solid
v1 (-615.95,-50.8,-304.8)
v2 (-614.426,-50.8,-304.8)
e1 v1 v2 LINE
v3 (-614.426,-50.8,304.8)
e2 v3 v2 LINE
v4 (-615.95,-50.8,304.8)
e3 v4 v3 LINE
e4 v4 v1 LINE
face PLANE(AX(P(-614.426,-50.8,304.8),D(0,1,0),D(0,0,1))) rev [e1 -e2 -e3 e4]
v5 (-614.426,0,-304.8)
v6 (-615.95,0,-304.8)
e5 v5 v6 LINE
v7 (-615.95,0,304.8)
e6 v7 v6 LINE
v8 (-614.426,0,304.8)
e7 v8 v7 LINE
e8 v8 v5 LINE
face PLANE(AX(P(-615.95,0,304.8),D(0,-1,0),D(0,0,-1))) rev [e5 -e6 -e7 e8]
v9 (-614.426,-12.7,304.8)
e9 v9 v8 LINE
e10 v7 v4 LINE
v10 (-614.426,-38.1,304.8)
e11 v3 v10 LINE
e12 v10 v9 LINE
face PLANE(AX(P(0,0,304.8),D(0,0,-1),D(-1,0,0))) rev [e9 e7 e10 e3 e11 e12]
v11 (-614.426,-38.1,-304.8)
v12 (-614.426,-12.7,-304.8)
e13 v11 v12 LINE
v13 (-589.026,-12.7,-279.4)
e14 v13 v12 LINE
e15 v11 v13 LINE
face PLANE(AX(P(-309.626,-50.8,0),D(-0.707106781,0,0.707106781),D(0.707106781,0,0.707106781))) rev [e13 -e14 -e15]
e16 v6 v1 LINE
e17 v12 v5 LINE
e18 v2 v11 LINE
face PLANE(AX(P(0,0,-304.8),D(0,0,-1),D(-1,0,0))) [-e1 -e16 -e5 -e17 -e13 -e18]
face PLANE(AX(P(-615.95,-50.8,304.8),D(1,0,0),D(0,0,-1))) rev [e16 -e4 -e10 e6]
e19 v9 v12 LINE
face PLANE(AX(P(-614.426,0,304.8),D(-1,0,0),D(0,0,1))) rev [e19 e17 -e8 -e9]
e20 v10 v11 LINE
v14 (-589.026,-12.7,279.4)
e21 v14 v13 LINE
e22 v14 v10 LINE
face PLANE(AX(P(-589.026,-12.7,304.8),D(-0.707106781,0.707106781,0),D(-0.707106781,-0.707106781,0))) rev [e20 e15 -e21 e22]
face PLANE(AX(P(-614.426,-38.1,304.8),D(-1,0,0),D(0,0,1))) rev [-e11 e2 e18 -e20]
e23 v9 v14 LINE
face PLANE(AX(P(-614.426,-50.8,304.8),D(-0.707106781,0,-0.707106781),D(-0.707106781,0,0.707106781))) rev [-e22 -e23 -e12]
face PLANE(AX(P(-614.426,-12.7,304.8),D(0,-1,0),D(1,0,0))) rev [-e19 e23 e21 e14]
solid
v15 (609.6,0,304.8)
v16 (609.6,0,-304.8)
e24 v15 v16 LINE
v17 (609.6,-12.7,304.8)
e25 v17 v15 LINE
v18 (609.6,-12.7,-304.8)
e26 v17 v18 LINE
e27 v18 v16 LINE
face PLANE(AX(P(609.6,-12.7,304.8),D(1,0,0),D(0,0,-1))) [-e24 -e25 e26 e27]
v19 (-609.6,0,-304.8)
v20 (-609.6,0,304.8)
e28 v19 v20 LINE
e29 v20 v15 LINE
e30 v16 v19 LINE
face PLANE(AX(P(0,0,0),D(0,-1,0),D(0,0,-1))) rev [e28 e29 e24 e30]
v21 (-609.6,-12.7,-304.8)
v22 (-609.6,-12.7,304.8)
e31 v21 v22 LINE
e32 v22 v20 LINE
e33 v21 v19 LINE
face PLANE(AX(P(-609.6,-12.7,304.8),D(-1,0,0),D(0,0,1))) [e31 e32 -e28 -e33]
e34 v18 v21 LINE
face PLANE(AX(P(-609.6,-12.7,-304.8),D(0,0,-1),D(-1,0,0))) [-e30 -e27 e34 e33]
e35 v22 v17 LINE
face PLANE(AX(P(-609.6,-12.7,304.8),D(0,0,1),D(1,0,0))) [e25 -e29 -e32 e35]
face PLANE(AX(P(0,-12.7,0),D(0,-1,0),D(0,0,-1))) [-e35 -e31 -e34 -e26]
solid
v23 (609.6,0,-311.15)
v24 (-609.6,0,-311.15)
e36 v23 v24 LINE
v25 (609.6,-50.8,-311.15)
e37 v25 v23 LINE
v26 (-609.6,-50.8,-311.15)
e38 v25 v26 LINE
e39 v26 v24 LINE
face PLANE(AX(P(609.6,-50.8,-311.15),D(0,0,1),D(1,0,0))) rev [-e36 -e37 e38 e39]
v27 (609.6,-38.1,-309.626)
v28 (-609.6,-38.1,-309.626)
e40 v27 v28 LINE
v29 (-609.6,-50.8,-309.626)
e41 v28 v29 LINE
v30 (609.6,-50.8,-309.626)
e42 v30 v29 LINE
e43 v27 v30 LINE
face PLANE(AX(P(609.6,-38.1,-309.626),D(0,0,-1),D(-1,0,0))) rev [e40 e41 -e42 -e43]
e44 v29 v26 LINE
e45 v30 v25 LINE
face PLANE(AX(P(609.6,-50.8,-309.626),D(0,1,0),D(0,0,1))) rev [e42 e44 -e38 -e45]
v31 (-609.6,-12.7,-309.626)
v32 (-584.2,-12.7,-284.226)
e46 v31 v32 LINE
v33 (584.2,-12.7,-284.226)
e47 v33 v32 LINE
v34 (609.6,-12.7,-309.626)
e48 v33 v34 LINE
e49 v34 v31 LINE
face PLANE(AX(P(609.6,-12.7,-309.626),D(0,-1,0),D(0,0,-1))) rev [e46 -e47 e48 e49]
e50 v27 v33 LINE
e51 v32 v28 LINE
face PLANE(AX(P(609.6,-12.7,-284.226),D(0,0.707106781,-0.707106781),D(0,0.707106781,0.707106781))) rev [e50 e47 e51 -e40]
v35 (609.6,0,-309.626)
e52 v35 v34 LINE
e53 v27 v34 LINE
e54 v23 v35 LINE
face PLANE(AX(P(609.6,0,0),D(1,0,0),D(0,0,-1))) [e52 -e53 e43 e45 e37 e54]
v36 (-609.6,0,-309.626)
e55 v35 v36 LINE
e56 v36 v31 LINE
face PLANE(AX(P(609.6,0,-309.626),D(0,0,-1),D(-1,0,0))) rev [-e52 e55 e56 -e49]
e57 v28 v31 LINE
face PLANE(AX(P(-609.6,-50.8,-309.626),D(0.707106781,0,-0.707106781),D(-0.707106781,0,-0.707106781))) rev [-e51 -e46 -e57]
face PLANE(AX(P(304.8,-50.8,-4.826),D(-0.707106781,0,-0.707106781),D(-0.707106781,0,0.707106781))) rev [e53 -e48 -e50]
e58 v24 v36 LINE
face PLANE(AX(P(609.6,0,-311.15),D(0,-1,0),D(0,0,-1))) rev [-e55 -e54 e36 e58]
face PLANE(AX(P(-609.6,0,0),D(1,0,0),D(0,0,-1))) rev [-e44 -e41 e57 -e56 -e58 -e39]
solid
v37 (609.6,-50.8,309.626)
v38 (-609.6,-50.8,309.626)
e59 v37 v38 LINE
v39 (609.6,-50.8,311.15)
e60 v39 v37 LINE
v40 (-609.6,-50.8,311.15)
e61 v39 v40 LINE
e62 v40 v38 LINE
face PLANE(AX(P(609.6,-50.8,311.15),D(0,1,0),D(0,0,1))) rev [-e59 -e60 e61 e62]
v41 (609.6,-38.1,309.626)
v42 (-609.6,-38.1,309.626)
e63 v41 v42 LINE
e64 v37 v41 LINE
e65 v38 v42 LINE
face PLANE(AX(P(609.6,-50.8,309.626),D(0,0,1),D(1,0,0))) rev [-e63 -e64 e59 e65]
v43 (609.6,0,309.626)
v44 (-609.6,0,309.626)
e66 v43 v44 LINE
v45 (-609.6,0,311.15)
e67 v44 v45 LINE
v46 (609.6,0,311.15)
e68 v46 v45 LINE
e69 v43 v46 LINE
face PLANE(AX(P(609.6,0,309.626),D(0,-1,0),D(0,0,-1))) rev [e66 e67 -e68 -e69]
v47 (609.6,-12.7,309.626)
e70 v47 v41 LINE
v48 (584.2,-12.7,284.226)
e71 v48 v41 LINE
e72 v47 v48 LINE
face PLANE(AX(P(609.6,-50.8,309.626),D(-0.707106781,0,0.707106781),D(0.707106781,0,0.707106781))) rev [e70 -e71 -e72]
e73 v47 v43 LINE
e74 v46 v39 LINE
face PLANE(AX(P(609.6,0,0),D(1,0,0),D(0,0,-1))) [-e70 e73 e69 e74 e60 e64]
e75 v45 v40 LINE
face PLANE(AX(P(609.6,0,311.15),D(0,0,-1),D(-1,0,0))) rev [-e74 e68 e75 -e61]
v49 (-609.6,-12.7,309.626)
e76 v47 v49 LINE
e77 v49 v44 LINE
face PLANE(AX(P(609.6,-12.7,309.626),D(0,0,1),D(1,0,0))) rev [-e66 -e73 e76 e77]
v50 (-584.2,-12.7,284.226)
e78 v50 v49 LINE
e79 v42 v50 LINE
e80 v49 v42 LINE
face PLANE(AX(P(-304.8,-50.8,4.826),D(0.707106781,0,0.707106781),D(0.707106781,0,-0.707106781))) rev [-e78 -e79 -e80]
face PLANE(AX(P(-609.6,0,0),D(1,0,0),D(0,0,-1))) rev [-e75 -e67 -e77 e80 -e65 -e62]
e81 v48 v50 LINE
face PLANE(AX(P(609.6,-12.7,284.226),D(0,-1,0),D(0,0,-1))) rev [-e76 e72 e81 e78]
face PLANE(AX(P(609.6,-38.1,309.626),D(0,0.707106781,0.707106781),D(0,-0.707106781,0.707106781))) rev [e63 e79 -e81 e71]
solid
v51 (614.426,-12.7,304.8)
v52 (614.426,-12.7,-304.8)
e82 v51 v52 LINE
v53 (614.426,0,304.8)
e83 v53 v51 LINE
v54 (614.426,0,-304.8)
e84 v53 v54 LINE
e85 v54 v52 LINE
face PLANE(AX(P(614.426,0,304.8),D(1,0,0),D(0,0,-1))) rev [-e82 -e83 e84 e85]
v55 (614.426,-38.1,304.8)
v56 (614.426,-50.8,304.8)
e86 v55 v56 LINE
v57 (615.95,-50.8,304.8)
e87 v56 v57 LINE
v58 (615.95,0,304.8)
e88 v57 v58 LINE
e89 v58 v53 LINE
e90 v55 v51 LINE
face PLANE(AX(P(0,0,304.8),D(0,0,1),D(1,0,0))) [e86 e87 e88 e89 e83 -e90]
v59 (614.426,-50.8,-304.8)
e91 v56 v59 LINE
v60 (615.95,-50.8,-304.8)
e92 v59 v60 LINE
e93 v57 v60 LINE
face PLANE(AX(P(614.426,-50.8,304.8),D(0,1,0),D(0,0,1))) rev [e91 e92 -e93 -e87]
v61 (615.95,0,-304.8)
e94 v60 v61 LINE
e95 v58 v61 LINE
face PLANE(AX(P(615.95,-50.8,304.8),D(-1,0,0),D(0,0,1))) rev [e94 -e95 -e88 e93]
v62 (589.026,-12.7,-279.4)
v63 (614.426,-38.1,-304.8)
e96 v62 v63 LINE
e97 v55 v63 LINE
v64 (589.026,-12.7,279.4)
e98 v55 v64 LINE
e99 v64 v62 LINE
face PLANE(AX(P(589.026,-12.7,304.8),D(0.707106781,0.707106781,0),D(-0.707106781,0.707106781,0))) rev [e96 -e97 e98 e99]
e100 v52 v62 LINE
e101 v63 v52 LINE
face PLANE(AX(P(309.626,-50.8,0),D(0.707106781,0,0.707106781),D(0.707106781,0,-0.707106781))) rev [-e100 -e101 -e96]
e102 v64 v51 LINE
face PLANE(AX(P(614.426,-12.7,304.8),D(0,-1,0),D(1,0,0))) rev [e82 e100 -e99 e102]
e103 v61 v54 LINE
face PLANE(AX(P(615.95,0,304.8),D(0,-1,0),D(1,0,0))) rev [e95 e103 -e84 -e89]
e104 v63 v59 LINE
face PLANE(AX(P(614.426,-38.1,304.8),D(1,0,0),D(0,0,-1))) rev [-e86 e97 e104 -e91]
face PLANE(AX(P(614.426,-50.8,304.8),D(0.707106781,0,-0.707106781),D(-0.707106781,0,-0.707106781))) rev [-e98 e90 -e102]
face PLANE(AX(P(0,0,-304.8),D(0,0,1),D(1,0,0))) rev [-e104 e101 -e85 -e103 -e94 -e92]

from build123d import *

# Parameters (mm, degrees)
SKETCH1_W             = 1219.2
SKETCH1_H             = 609.6
BOSS_EXTRUDE1_DEPTH   = 12.7
BOSS_EXTRUDE2_DEPTH   = 609.6
BOSS_EXTRUDE2_2_DEPTH = 609.6
BOSS_EXTRUDE3_DEPTH   = 304.8
BOSS_EXTRUDE3_2_DEPTH = 304.8
CUT_EXTRUDE1_START    = -38.1
CUT_EXTRUDE1_DEPTH    = 25.4
CUT_EXTRUDE1_2_DEPTH  = 25.4
CUT_EXTRUDE1_3_DEPTH  = 25.4
CUT_EXTRUDE1_4_DEPTH  = 25.4


# Read off the part's stored shape, not the designer's step: Cut-Extrude1
with BuildPart() as part:
    # Sketch1 → Boss-Extrude1 (new body)
    with BuildSketch(Plane(origin=(0, 0, 0), x_dir=(1, 0, 0), z_dir=(0, 1, 0))):
        Rectangle(SKETCH1_W, SKETCH1_H)
    extrude(amount=-BOSS_EXTRUDE1_DEPTH)


with BuildPart() as body_2:
    # Sketch2 → Boss-Extrude2 (new, symmetric)
    with BuildSketch(Plane(origin=(0, 0, 0), x_dir=(0, 0, -1), z_dir=(1, 0, 0))):
        Polygon((-311.15, 0), (-311.15, -50.8), (-309.626, -50.8), (-309.626, -38.1), (-284.226, -12.7), (-309.626, -12.7), (-309.626, 0), align=None)
    extrude(amount=BOSS_EXTRUDE2_DEPTH, both=True)

    # Cut-Extrude1 4 outline → Cut-Extrude1 4 (cut)
    with BuildSketch(Plane(origin=(0, 0, 0), x_dir=(1, 0, 0), z_dir=(0, 1, 0)).offset(CUT_EXTRUDE1_START)):
        Polygon((-609.6, -283), (-609.6, -309.626), (-582.974, -283), align=None)
        Polygon((609.6, -283), (582.974, -283), (609.6, -309.626), align=None)
    extrude(amount=CUT_EXTRUDE1_4_DEPTH, mode=Mode.SUBTRACT)


with BuildPart() as body_3:
    # Sketch2 → Boss-Extrude2 2 (new, symmetric)
    with BuildSketch(Plane(origin=(0, 0, 0), x_dir=(0, 0, -1), z_dir=(1, 0, 0))):
        Polygon((311.15, 0), (309.626, 0), (309.626, -12.7), (284.226, -12.7), (309.626, -38.1), (309.626, -50.8), (311.15, -50.8), align=None)
    extrude(amount=BOSS_EXTRUDE2_2_DEPTH, both=True)

    # Cut-Extrude1 2 outline → Cut-Extrude1 2 (cut)
    with BuildSketch(Plane(origin=(0, 0, 0), x_dir=(1, 0, 0), z_dir=(0, 1, 0)).offset(CUT_EXTRUDE1_START)):
        Polygon((-582.974, 283), (-609.6, 309.626), (-609.6, 283), align=None)
        Polygon((609.6, 309.626), (582.974, 283), (609.6, 283), align=None)
    extrude(amount=CUT_EXTRUDE1_2_DEPTH, mode=Mode.SUBTRACT)


with BuildPart() as body_4:
    # Sketch3 → Boss-Extrude3 (new, symmetric)
    with BuildSketch(Plane.XY):
        Polygon((615.95, 0), (614.426, 0), (614.426, -12.7), (589.026, -12.7), (614.426, -38.1), (614.426, -50.8), (615.95, -50.8), align=None)
    extrude(amount=BOSS_EXTRUDE3_DEPTH, both=True)

    # Cut-Extrude1 3 outline → Cut-Extrude1 3 (cut)
    with BuildSketch(Plane(origin=(0, 0, 0), x_dir=(1, 0, 0), z_dir=(0, 1, 0)).offset(CUT_EXTRUDE1_START)):
        Polygon((588, 278.374), (614.426, 304.8), (588, 304.8), align=None)
        Polygon((614.426, -304.8), (588, -278.374), (588, -304.8), align=None)
    extrude(amount=CUT_EXTRUDE1_3_DEPTH, mode=Mode.SUBTRACT)


with BuildPart() as body_5:
    # Sketch3 → Boss-Extrude3 2 (new, symmetric)
    with BuildSketch(Plane.XY):
        Polygon((-615.95, 0), (-614.426, 0), (-614.426, -12.7), (-589.026, -12.7), (-614.426, -38.1), (-614.426, -50.8), (-615.95, -50.8), align=None)
    extrude(amount=BOSS_EXTRUDE3_2_DEPTH, both=True)

    # Cut-Extrude1 outline → Cut-Extrude1 (cut)
    with BuildSketch(Plane(origin=(0, 0, 0), x_dir=(1, 0, 0), z_dir=(0, 1, 0)).offset(CUT_EXTRUDE1_START)):
        Polygon((-588, 304.8), (-614.426, 304.8), (-588, 278.374), align=None)
        Polygon((-588, -304.8), (-588, -278.374), (-614.426, -304.8), align=None)
    extrude(amount=CUT_EXTRUDE1_DEPTH, mode=Mode.SUBTRACT)


solid = Compound([part.part, body_2.part, body_3.part, body_4.part, body_5.part])
